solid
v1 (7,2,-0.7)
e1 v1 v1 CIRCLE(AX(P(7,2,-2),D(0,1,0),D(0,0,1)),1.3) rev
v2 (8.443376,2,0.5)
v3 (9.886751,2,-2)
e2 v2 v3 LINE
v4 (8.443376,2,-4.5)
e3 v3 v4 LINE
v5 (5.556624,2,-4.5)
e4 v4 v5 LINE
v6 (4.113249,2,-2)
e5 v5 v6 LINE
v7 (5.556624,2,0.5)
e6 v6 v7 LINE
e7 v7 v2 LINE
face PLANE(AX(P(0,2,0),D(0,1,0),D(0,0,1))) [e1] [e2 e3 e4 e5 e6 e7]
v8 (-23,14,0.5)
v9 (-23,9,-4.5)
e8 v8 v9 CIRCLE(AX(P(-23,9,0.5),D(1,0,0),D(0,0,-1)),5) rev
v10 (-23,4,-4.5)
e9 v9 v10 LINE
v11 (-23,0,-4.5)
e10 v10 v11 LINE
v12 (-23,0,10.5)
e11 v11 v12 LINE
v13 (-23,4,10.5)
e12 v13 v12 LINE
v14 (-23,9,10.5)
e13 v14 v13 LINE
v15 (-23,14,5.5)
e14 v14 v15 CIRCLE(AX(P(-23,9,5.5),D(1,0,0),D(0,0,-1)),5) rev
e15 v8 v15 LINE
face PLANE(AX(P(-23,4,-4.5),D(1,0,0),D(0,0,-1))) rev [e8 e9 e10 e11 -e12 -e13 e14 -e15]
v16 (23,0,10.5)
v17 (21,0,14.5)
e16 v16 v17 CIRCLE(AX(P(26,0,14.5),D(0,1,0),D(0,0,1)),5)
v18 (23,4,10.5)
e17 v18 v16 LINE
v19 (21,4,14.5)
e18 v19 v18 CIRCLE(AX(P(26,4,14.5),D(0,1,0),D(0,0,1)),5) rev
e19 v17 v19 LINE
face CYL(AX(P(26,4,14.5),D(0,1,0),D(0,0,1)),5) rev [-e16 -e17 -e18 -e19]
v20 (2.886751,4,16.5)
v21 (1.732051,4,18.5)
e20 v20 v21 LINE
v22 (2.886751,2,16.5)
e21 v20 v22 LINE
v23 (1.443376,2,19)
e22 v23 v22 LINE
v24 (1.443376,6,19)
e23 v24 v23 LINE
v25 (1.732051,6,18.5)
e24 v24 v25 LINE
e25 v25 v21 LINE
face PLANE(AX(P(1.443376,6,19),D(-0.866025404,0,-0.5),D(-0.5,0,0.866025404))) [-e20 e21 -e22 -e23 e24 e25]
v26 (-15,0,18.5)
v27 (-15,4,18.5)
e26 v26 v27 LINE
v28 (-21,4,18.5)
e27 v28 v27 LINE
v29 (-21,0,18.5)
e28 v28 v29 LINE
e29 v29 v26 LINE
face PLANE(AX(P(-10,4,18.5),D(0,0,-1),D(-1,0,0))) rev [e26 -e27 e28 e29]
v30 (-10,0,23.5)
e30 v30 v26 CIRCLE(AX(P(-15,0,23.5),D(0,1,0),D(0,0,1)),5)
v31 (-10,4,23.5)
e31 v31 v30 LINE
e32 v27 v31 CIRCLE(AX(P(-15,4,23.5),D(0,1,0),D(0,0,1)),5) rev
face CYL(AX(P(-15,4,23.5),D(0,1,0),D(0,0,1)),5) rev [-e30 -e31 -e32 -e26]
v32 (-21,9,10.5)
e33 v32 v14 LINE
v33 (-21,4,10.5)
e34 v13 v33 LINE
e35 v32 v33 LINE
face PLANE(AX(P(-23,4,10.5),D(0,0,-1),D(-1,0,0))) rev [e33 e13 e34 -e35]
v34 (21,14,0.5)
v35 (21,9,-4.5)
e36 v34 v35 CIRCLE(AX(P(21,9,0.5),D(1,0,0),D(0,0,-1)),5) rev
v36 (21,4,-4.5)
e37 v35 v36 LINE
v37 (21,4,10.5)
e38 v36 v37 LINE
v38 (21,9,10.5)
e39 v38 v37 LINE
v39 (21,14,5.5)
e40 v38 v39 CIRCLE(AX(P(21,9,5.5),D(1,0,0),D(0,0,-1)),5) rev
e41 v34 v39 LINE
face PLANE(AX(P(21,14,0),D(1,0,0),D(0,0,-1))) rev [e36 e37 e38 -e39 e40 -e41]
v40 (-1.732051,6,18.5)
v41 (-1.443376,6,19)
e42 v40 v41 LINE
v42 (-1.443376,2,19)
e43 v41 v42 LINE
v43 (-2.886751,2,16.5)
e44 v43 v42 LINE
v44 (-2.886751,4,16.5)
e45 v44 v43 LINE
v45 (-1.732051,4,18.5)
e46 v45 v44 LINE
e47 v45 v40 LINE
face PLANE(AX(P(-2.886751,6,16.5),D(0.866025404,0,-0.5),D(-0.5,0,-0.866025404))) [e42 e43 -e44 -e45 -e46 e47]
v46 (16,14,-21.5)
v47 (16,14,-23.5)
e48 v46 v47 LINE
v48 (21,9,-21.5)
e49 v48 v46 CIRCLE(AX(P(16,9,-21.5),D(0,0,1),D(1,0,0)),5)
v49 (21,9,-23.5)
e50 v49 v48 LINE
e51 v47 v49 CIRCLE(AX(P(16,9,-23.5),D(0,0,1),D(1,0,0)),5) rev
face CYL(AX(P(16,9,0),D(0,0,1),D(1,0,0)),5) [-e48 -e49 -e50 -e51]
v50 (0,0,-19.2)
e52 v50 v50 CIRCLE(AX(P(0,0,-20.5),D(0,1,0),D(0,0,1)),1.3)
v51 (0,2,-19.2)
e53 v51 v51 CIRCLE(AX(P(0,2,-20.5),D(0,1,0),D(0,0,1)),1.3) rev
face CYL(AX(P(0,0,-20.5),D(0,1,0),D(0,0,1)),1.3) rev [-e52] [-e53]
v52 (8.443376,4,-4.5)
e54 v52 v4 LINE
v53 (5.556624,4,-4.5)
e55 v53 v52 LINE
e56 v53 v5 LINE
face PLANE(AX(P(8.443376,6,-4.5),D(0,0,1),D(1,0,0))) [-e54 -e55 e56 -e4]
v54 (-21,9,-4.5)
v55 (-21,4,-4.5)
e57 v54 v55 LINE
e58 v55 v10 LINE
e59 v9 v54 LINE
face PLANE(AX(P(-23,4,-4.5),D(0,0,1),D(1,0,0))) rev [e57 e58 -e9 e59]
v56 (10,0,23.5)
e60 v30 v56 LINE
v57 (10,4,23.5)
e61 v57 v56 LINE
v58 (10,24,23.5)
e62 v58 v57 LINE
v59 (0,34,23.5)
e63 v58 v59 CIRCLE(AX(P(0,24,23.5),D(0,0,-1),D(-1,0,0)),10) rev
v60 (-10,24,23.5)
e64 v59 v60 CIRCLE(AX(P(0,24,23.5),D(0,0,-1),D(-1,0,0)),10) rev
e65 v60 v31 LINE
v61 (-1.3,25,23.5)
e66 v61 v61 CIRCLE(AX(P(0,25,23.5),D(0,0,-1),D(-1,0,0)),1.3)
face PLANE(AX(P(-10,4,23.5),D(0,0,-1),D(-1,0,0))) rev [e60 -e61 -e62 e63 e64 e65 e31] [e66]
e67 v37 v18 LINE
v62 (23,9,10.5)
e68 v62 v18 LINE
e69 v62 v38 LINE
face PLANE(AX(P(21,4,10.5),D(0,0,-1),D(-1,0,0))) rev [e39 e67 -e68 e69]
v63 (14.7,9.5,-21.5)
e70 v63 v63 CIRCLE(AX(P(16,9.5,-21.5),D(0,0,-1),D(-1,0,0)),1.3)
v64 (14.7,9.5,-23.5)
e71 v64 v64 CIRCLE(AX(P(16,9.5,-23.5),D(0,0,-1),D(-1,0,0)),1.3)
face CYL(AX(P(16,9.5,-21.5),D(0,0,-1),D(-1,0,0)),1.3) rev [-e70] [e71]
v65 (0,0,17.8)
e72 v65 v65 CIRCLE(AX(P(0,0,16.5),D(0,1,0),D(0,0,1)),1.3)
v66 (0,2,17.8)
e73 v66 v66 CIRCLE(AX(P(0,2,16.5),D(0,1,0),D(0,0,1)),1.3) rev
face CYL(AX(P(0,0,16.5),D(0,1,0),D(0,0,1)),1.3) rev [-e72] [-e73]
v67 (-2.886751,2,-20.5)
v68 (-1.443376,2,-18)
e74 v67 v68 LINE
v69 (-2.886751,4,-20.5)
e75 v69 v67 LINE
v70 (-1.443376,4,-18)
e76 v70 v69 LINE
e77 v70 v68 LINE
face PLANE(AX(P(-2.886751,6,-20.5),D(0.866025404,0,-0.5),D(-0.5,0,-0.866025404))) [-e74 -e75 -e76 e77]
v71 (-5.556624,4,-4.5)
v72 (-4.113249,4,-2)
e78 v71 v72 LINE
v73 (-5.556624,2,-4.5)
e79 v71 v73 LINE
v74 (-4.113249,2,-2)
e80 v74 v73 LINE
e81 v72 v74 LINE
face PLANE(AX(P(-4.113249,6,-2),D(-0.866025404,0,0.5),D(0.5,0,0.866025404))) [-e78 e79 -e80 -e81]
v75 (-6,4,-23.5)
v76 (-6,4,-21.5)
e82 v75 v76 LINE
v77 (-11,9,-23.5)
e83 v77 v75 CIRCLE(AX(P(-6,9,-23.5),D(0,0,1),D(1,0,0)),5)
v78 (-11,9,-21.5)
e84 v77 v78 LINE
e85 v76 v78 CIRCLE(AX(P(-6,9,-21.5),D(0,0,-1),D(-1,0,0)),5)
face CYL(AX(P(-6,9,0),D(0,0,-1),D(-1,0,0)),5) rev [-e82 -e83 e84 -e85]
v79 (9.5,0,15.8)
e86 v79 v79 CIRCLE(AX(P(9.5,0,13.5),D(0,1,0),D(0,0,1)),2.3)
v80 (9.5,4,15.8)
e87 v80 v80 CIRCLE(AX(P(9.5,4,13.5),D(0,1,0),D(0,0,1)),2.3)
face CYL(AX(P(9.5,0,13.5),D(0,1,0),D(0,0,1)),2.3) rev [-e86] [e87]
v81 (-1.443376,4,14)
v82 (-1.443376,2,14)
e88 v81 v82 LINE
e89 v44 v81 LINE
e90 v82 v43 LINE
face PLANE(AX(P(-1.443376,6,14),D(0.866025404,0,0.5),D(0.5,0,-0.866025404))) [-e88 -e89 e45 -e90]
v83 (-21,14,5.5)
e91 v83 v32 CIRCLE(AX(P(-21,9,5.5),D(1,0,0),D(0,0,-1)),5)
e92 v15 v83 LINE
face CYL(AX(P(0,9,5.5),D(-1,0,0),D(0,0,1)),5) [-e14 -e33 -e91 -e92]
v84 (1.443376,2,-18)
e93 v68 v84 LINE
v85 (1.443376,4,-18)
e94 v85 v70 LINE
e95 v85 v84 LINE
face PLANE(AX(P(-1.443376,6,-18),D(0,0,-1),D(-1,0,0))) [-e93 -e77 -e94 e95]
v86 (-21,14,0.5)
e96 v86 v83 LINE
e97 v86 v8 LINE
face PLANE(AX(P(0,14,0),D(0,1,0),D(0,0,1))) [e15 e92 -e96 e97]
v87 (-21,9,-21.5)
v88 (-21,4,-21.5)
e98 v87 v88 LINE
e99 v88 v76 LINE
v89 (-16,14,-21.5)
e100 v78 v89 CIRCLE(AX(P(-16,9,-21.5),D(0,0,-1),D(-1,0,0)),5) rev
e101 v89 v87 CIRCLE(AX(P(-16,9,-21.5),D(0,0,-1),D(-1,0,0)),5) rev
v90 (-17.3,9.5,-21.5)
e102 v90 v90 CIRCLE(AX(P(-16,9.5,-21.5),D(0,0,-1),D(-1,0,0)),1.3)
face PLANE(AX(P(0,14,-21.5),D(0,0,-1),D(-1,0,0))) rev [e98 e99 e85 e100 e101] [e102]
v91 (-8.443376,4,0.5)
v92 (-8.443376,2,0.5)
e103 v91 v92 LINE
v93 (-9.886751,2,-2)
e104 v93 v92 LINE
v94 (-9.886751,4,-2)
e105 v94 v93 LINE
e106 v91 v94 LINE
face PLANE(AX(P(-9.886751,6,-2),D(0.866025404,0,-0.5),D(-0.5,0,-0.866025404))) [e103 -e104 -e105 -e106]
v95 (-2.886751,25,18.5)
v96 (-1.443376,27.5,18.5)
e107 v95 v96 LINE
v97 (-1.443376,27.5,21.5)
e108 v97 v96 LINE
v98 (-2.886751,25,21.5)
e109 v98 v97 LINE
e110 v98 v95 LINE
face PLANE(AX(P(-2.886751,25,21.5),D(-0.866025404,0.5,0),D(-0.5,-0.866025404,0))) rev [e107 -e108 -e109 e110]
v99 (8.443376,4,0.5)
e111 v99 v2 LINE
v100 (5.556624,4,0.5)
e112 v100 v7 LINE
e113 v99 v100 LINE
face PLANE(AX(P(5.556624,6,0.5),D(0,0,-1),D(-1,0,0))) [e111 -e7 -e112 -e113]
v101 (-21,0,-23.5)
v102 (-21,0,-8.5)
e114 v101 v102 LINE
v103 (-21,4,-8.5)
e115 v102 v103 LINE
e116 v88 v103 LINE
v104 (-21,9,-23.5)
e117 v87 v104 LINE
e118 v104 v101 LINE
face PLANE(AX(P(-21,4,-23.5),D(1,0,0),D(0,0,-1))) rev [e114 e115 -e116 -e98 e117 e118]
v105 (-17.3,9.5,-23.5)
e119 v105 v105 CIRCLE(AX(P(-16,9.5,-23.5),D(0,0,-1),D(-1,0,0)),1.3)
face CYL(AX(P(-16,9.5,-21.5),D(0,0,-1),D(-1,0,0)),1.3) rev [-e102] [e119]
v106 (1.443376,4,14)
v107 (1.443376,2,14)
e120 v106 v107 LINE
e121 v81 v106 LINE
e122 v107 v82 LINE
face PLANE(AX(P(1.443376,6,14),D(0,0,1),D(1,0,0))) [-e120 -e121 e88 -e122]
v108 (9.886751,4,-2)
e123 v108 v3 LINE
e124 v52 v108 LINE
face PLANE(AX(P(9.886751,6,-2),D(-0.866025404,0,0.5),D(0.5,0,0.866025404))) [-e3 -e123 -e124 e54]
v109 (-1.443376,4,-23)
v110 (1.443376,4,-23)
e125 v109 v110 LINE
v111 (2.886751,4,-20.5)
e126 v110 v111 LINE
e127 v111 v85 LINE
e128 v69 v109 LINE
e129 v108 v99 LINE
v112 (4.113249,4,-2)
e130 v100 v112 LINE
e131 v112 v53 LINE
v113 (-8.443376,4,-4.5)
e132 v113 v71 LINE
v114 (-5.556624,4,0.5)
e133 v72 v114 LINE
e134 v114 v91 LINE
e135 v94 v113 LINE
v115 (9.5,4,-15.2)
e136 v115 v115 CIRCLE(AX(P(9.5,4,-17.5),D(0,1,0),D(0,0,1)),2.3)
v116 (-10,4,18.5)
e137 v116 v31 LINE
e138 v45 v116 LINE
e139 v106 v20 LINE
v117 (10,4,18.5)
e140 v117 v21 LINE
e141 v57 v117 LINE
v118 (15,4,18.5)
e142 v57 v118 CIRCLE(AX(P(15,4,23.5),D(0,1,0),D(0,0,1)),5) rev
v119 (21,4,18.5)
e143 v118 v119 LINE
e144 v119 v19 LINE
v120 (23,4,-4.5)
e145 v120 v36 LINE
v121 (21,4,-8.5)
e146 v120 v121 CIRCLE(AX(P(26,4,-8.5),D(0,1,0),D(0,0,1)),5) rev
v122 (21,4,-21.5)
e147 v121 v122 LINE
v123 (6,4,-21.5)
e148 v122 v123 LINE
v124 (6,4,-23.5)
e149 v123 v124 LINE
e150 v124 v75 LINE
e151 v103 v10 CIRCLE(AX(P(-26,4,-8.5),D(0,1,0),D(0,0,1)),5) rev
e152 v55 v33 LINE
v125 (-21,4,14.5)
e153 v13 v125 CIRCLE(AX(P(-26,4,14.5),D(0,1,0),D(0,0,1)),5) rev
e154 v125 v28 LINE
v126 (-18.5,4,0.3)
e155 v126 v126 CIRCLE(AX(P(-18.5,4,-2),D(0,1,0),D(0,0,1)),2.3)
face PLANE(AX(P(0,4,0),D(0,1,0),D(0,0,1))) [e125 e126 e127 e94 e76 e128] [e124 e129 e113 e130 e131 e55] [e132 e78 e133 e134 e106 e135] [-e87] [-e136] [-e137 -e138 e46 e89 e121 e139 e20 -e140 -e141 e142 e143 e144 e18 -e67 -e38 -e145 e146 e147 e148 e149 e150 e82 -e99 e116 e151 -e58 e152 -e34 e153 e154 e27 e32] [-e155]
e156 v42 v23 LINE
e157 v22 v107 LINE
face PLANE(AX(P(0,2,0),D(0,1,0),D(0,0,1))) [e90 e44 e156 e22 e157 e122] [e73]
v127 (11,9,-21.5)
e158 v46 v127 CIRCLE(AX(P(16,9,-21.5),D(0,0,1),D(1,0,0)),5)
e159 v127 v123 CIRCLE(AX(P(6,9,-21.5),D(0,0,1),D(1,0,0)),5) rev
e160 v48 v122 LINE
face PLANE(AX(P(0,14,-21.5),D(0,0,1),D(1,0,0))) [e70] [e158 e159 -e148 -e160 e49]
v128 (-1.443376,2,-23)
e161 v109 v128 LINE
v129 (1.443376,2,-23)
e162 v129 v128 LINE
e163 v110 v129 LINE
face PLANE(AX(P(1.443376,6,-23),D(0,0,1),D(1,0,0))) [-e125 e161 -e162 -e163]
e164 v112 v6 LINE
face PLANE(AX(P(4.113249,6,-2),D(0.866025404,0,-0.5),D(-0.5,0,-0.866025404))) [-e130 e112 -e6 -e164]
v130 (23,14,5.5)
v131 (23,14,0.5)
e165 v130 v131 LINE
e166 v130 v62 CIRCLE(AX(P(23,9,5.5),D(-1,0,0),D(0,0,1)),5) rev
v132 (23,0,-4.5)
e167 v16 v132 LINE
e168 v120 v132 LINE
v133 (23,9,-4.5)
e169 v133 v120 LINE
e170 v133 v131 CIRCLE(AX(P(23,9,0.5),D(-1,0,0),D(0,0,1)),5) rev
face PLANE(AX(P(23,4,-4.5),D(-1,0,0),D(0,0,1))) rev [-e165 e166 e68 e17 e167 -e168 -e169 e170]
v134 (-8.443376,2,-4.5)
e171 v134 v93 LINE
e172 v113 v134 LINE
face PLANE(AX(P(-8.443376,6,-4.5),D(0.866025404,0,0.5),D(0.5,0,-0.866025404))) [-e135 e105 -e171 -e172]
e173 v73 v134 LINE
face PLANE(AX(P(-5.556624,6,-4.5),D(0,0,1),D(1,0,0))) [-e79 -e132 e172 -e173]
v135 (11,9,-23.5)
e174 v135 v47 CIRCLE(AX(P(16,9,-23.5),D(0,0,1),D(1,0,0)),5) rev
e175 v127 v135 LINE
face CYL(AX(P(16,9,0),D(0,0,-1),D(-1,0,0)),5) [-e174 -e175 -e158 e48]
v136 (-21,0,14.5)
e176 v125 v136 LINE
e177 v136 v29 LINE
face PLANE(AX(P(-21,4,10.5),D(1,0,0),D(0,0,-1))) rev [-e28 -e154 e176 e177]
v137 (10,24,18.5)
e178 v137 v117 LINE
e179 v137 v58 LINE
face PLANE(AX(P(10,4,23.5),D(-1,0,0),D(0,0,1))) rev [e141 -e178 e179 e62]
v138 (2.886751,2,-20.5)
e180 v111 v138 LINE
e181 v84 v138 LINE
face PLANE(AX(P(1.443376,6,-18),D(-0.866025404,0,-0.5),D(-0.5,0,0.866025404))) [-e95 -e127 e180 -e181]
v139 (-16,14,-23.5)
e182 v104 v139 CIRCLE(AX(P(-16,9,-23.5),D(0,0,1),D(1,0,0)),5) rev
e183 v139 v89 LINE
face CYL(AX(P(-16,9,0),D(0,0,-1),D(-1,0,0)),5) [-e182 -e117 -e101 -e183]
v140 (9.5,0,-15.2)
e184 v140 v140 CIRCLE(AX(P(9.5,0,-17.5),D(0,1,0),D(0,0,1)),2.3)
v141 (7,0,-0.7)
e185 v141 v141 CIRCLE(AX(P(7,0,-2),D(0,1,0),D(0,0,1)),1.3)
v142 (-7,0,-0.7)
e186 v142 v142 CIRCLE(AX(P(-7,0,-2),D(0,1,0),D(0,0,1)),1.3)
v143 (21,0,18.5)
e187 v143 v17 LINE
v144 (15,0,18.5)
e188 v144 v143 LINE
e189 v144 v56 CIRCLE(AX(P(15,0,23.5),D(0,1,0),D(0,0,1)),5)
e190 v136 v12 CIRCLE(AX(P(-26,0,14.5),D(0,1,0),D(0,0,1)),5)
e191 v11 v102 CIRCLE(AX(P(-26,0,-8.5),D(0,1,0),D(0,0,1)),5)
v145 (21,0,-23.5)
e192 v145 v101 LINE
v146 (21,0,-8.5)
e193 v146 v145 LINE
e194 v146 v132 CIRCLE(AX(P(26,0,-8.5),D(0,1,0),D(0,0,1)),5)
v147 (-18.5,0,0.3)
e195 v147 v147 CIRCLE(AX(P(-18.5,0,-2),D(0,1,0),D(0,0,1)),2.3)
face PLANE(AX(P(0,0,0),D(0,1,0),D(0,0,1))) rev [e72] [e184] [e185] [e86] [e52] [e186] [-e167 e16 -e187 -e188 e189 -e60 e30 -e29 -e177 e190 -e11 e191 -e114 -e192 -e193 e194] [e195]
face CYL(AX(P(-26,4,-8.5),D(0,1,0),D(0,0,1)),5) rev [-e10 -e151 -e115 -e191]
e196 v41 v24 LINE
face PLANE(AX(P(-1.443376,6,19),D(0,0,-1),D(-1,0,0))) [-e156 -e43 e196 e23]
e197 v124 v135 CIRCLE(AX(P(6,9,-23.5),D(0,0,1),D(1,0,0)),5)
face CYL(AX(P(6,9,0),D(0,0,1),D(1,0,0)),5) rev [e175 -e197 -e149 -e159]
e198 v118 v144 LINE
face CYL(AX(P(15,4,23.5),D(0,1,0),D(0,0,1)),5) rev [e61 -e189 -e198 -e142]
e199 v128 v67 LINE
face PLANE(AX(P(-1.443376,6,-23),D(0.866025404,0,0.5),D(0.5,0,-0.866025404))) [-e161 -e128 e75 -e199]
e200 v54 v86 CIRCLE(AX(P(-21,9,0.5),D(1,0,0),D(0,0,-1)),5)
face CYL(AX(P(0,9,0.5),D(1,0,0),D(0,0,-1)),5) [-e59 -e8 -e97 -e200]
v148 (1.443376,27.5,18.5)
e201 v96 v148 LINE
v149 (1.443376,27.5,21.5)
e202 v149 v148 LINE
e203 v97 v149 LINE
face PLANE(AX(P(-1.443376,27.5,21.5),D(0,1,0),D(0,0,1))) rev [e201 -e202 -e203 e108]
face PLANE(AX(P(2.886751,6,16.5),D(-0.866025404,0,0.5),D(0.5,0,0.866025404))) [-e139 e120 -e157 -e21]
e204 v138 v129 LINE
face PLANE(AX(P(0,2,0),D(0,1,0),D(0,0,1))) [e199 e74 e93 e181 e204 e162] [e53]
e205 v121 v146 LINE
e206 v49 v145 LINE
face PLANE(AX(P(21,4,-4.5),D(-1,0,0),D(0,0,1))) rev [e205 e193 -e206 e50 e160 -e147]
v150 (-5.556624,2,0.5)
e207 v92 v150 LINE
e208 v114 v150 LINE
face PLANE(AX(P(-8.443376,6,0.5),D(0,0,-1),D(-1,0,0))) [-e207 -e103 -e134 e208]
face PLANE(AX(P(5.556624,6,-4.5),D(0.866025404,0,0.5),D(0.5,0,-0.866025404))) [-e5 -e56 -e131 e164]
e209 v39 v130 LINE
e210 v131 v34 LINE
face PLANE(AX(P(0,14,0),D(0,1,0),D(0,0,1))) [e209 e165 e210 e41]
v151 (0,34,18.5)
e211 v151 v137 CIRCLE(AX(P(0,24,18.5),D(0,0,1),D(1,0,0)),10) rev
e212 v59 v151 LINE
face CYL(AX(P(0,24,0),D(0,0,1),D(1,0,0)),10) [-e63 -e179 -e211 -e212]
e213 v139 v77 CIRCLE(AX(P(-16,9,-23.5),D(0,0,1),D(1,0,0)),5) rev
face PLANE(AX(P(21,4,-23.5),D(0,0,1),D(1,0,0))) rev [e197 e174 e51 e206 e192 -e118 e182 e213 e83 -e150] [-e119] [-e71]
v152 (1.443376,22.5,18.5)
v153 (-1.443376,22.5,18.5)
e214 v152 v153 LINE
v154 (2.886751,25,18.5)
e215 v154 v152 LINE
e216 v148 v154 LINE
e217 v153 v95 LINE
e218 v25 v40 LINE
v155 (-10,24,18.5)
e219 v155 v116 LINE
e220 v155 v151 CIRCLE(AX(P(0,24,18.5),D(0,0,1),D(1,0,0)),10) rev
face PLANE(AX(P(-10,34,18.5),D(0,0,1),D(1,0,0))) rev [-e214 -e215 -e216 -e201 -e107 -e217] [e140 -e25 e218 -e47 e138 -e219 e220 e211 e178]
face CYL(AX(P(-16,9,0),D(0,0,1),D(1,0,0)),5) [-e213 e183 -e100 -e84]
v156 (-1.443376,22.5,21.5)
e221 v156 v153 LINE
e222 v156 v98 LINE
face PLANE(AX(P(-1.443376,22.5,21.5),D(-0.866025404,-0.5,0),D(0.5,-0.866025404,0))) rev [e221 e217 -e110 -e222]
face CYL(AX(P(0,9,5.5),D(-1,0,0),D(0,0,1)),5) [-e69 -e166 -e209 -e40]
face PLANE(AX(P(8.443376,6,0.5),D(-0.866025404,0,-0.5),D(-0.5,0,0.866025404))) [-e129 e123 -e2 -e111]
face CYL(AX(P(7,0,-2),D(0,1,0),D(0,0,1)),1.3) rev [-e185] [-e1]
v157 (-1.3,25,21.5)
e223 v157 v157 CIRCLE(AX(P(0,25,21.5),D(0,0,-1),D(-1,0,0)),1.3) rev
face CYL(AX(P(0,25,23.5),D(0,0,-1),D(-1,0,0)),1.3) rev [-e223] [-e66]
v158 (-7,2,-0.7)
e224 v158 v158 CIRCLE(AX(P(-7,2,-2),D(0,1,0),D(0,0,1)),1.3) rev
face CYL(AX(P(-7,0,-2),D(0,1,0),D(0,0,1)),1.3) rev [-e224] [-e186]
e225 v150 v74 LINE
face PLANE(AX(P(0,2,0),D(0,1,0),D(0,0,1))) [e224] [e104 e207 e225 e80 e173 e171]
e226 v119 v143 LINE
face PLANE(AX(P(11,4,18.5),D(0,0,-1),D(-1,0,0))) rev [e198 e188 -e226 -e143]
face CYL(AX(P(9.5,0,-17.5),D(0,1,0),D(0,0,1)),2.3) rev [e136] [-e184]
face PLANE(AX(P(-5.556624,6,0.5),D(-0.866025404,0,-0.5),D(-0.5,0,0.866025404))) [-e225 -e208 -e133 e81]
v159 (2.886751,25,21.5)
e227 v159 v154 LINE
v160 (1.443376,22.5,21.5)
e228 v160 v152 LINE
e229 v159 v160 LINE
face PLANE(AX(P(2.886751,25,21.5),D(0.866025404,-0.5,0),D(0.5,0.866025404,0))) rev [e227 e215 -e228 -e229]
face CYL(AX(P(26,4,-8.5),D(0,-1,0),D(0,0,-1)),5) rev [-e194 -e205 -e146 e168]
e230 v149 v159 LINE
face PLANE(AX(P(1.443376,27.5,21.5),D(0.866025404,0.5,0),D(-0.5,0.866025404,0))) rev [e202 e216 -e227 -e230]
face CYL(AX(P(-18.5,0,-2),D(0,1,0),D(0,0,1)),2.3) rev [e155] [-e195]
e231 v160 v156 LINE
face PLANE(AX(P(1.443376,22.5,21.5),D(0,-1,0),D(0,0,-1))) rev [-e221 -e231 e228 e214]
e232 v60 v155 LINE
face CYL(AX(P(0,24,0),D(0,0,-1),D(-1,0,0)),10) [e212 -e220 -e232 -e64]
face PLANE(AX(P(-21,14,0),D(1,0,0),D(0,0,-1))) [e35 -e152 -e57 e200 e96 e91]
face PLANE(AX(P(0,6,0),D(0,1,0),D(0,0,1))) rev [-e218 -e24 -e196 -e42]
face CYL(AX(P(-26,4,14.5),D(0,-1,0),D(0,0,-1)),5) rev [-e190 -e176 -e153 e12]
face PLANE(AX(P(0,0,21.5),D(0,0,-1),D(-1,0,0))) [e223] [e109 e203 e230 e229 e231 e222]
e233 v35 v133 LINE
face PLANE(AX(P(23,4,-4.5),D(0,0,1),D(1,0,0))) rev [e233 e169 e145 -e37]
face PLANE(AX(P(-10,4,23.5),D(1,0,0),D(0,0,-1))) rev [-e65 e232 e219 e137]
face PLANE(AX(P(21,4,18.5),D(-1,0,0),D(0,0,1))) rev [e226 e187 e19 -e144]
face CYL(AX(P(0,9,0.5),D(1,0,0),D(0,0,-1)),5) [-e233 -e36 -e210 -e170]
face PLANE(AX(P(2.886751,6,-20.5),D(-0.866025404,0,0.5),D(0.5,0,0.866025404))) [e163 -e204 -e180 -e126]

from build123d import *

# Parameters (mm, degrees)
EXTRUDE_1_DEPTH          = 4
SKETCH_2_W               = 2
SKETCH_2_H               = 15
SKETCH_2_W_2             = 10
SKETCH_2_H_2             = 2
EXTRUDE_2_DEPTH          = 10
SKETCH_3_W               = 20
SKETCH_3_H               = 5
EXTRUDE_3_DEPTH          = 30
SKETCH_4_R               = 1.3
CUT_EXTRUDE_1_DEPTH      = 2
SKETCH_5_R               = 1.3
CUT_EXTRUDE_2_DEPTH      = 59.72818744
CUT_EXTRUDE_3_DEPTH      = 3
SKETCH_7_R               = 1.3
SKETCH_7_R_2             = 2.3
CUT_EXTRUDE_5_DEPTH      = 45.511234537
CUT_EXTRUDE_6_DEPTH      = 2
CUT_EXTRUDE_6_DEPTH_BACK = 2
FILLET_1_R               = 10
FILLET_2_DEPTH           = 4
FILLET_START             = -23.5
FILLET_2_2_DEPTH         = 2
FILLET_START_2           = -24
FILLET_2_3_DEPTH         = 48
FILLET_2_4_DEPTH         = 2
FILLET_3_R               = 5


with BuildPart() as part:
    # 草图1 → 凸台-拉伸1 (new body)
    with BuildSketch(Plane(origin=(0, 0, 0), x_dir=(1, 0, 0), z_dir=(0, 1, 0))):
        Polygon((-21, 23.5), (-21, 4.5), (-23, 4.5), (-23, -10.5), (-21, -10.5), (-21, -18.5), (-11, -18.5), (-10, -18.5), (-10, -23.5), (10, -23.5), (10, -18.5), (11, -18.5), (21, -18.5), (21, -10.5), (23, -10.5), (23, 4.5), (21, 4.5), (21, 23.5), align=None)
    extrude(amount=EXTRUDE_1_DEPTH)

    # 草图2 → 凸台-拉伸2 (add)
    with BuildSketch(Plane(origin=(0, 4, 0), x_dir=(1, 0, 0), z_dir=(0, 1, 0))):
        with Locations((-22, -3)):
            Rectangle(SKETCH_2_W, SKETCH_2_H)
        with Locations((-16, 22.5)):
            Rectangle(SKETCH_2_W_2, SKETCH_2_H_2)
        with Locations((16, 22.5)):
            Rectangle(SKETCH_2_W_2, SKETCH_2_H_2)
        with Locations((22, -3)):
            Rectangle(SKETCH_2_W, SKETCH_2_H)
    extrude(amount=EXTRUDE_2_DEPTH)

    # 草图3 → 凸台-拉伸3 (add)
    with BuildSketch(Plane(origin=(0, 4, 0), x_dir=(1, 0, 0), z_dir=(0, 1, 0))):
        with Locations((0, -21)):
            Rectangle(SKETCH_3_W, SKETCH_3_H)
    extrude(amount=EXTRUDE_3_DEPTH)

    # 草图4 → 切除-拉伸1 (cut)
    with BuildSketch(Plane(origin=(0, 0, -23.5), x_dir=(-1, 0, 0), z_dir=(0, 0, -1))):
        with Locations((-16, 9.5)):
            Circle(SKETCH_4_R)
        with Locations((16, 9.5)):
            Circle(SKETCH_4_R)
    extrude(amount=-CUT_EXTRUDE_1_DEPTH, mode=Mode.SUBTRACT)

    # 草图5 → 切除-拉伸2 (cut, through all)
    with BuildSketch(Plane(origin=(0, 0, 18.5), x_dir=(-1, 0, 0), z_dir=(0, 0, -1))):
        with Locations((0, 25)):
            Circle(SKETCH_5_R)
    extrude(amount=-CUT_EXTRUDE_2_DEPTH, mode=Mode.SUBTRACT)

    # 草图6 → 切除-拉伸3 (cut)
    with BuildSketch(Plane(origin=(0, 0, 18.5), x_dir=(-1, 0, 0), z_dir=(0, 0, -1))):
        Polygon((2.886751346, 25), (1.443375673, 27.5), (-1.443375673, 27.5), (-2.886751346, 25), (-1.443375673, 22.5), (1.443375673, 22.5), align=None)
    extrude(amount=-CUT_EXTRUDE_3_DEPTH, mode=Mode.SUBTRACT)

    # 草图7 → 切除-拉伸5 (cut, through all)
    with BuildSketch(Plane(origin=(0, 4, 0), x_dir=(1, 0, 0), z_dir=(0, 1, 0))):
        with Locations(Location((0, 20.5, 0), (0, 0, 270))):
            Circle(SKETCH_7_R)
        with Locations(Location((-7, 2, 0), (0, 0, 270))):
            Circle(SKETCH_7_R)
        with Locations(Location((7, 2, 0), (0, 0, 270))):
            Circle(SKETCH_7_R)
        with Locations(Location((0, -16.5, 0), (0, 0, 270))):
            Circle(SKETCH_7_R)
        with Locations(Location((-18.5, 2, 0), (0, 0, 270))):
            Circle(SKETCH_7_R_2)
        with Locations(Location((9.5, 17.5, 0), (0, 0, 270))):
            Circle(SKETCH_7_R_2)
        with Locations(Location((9.5, -13.5, 0), (0, 0, 270))):
            Circle(SKETCH_7_R_2)
    extrude(amount=-CUT_EXTRUDE_5_DEPTH, mode=Mode.SUBTRACT)

    # 草图8 → 切除-拉伸6 (cut, two sides: drawn at the far end of the back side and taken through both)
    with BuildSketch(Plane(origin=(0, 4, 0), x_dir=(1, 0, 0), z_dir=(0, 1, 0)).offset(-CUT_EXTRUDE_6_DEPTH_BACK)):
        Polygon((9.886751346, 2), (8.443375673, 4.5), (5.556624327, 4.5), (4.113248654, 2), (5.556624327, -0.5), (8.443375673, -0.5), align=None)
        Polygon((-4.113248654, 2), (-5.556624327, 4.5), (-8.443375673, 4.5), (-9.886751346, 2), (-8.443375673, -0.5), (-5.556624327, -0.5), align=None)
        Polygon((2.886751346, 20.5), (1.443375673, 23), (-1.443375673, 23), (-2.886751346, 20.5), (-1.443375673, 18), (1.443375673, 18), align=None)
        Polygon((2.886751346, -16.5), (1.443375673, -14), (-1.443375673, -14), (-2.886751346, -16.5), (-1.443375673, -19), (1.443375673, -19), align=None)
    extrude(amount=CUT_EXTRUDE_6_DEPTH + CUT_EXTRUDE_6_DEPTH_BACK, mode=Mode.SUBTRACT)

    # 圆角1
    fillet_1_edges = [part.edges().sort_by_distance(p)[0] for p in [
        (-10, 34, 21),
        (10, 34, 21),
    ]]
    fillet(fillet_1_edges, radius=FILLET_1_R - 0.0001)  # a hair under: the kernel refuses the full size

    # 圆角2: read off the stored shape, not the designer's step
    # 圆角2 outline → 圆角2 (add)
    with BuildSketch(Plane(origin=(0, 0, 0), x_dir=(1, 0, 0), z_dir=(0, 1, 0))):
        with BuildLine():
            Line((-21, 4.5), (-21, 8.5))
            ThreePointArc((-21, 8.5), (-21.527864045, 6.263932023), (-23, 4.5))
            Line((-23, 4.5), (-21, 4.5))
        make_face()
        with BuildLine():
            ThreePointArc((21, -14.5), (21.527864045, -12.263932023), (23, -10.5))
            Line((23, -10.5), (21, -10.5))
            Line((21, -10.5), (21, -14.5))
        make_face()
        with BuildLine():
            Line((21, 4.5), (23, 4.5))
            ThreePointArc((23, 4.5), (21.527864045, 6.263932023), (21, 8.5))
            Line((21, 8.5), (21, 4.5))
        make_face()
        with BuildLine():
            Line((-21, -10.5), (-23, -10.5))
            ThreePointArc((-23, -10.5), (-21.527864045, -12.263932023), (-21, -14.5))
            Line((-21, -14.5), (-21, -10.5))
        make_face()
    extrude(amount=FILLET_2_DEPTH)

    # Fillet 2 2 outline → Fillet 2 2 (add)
    with BuildSketch(Plane.XY.offset(FILLET_START)):
        with BuildLine():
            Line((11, 4), (11, 9))
            ThreePointArc((11, 9), (9.535533906, 5.464466094), (6, 4))
            Line((6, 4), (11, 4))
        make_face()
        with BuildLine():
            Line((-11, 4), (-6, 4))
            ThreePointArc((-6, 4), (-9.535533906, 5.464466094), (-11, 9))
            Line((-11, 9), (-11, 4))
        make_face()
    extrude(amount=FILLET_2_2_DEPTH)

    # Fillet 2 3 outline → Fillet 2 3 (cut)
    with BuildSketch(Plane.YZ.offset(FILLET_START_2)):
        with BuildLine():
            Line((14, 10.5), (9, 10.5))
            ThreePointArc((9, 10.5), (12.535533906, 9.035533906), (14, 5.5))
            Line((14, 5.5), (14, 10.5))
        make_face()
        with BuildLine():
            Line((14, -4.5), (14, 0.5))
            ThreePointArc((14, 0.5), (12.535533906, -3.035533906), (9, -4.5))
            Line((9, -4.5), (14, -4.5))
        make_face()
    extrude(amount=FILLET_2_3_DEPTH, mode=Mode.SUBTRACT)

    # Fillet 2 4 outline → Fillet 2 4 (cut)
    with BuildSketch(Plane.XY.offset(FILLET_START)):
        with BuildLine():
            ThreePointArc((16, 14), (19.535533906, 12.535533906), (21, 9))
            Line((21, 9), (21, 14))
            Line((21, 14), (16, 14))
        make_face()
        with BuildLine():
            ThreePointArc((11, 9), (12.464466094, 12.535533906), (16, 14))
            Line((16, 14), (11, 14))
            Line((11, 14), (11, 9))
        make_face()
        with BuildLine():
            ThreePointArc((-16, 14), (-12.464466094, 12.535533906), (-11, 9))
            Line((-11, 9), (-11, 14))
            Line((-11, 14), (-16, 14))
        make_face()
        with BuildLine():
            Line((-21, 14), (-21, 9))
            ThreePointArc((-21, 9), (-19.535533906, 12.535533906), (-16, 14))
            Line((-16, 14), (-21, 14))
        make_face()
    extrude(amount=FILLET_2_4_DEPTH, mode=Mode.SUBTRACT)

    # 圆角3
    # the kernel refuses this fillet: 5 mm, written as the material it adds along each edge
    with BuildSketch(Plane(origin=(10, 0, 18.5), x_dir=(0, 0, 1), z_dir=(0, 1, 0))) as fillet_3_piece_1:
        with BuildLine():
            CenterArc((FILLET_3_R, FILLET_3_R), FILLET_3_R, 180, 90)
            Line((0, FILLET_3_R), (0, 0))
            Line((0, 0), (FILLET_3_R, 0))
        make_face()
    extrude(amount=4)
    with BuildSketch(Plane(origin=(-10, 0, 18.5), x_dir=(0, 0, 1), z_dir=(0, 1, 0))) as fillet_3_piece_2:
        with BuildLine():
            CenterArc((FILLET_3_R, -FILLET_3_R), FILLET_3_R, 90, 90)
            Line((0, -FILLET_3_R), (0, 0))
            Line((0, 0), (FILLET_3_R, 0))
        make_face()
    extrude(amount=4)


solid = part.part
